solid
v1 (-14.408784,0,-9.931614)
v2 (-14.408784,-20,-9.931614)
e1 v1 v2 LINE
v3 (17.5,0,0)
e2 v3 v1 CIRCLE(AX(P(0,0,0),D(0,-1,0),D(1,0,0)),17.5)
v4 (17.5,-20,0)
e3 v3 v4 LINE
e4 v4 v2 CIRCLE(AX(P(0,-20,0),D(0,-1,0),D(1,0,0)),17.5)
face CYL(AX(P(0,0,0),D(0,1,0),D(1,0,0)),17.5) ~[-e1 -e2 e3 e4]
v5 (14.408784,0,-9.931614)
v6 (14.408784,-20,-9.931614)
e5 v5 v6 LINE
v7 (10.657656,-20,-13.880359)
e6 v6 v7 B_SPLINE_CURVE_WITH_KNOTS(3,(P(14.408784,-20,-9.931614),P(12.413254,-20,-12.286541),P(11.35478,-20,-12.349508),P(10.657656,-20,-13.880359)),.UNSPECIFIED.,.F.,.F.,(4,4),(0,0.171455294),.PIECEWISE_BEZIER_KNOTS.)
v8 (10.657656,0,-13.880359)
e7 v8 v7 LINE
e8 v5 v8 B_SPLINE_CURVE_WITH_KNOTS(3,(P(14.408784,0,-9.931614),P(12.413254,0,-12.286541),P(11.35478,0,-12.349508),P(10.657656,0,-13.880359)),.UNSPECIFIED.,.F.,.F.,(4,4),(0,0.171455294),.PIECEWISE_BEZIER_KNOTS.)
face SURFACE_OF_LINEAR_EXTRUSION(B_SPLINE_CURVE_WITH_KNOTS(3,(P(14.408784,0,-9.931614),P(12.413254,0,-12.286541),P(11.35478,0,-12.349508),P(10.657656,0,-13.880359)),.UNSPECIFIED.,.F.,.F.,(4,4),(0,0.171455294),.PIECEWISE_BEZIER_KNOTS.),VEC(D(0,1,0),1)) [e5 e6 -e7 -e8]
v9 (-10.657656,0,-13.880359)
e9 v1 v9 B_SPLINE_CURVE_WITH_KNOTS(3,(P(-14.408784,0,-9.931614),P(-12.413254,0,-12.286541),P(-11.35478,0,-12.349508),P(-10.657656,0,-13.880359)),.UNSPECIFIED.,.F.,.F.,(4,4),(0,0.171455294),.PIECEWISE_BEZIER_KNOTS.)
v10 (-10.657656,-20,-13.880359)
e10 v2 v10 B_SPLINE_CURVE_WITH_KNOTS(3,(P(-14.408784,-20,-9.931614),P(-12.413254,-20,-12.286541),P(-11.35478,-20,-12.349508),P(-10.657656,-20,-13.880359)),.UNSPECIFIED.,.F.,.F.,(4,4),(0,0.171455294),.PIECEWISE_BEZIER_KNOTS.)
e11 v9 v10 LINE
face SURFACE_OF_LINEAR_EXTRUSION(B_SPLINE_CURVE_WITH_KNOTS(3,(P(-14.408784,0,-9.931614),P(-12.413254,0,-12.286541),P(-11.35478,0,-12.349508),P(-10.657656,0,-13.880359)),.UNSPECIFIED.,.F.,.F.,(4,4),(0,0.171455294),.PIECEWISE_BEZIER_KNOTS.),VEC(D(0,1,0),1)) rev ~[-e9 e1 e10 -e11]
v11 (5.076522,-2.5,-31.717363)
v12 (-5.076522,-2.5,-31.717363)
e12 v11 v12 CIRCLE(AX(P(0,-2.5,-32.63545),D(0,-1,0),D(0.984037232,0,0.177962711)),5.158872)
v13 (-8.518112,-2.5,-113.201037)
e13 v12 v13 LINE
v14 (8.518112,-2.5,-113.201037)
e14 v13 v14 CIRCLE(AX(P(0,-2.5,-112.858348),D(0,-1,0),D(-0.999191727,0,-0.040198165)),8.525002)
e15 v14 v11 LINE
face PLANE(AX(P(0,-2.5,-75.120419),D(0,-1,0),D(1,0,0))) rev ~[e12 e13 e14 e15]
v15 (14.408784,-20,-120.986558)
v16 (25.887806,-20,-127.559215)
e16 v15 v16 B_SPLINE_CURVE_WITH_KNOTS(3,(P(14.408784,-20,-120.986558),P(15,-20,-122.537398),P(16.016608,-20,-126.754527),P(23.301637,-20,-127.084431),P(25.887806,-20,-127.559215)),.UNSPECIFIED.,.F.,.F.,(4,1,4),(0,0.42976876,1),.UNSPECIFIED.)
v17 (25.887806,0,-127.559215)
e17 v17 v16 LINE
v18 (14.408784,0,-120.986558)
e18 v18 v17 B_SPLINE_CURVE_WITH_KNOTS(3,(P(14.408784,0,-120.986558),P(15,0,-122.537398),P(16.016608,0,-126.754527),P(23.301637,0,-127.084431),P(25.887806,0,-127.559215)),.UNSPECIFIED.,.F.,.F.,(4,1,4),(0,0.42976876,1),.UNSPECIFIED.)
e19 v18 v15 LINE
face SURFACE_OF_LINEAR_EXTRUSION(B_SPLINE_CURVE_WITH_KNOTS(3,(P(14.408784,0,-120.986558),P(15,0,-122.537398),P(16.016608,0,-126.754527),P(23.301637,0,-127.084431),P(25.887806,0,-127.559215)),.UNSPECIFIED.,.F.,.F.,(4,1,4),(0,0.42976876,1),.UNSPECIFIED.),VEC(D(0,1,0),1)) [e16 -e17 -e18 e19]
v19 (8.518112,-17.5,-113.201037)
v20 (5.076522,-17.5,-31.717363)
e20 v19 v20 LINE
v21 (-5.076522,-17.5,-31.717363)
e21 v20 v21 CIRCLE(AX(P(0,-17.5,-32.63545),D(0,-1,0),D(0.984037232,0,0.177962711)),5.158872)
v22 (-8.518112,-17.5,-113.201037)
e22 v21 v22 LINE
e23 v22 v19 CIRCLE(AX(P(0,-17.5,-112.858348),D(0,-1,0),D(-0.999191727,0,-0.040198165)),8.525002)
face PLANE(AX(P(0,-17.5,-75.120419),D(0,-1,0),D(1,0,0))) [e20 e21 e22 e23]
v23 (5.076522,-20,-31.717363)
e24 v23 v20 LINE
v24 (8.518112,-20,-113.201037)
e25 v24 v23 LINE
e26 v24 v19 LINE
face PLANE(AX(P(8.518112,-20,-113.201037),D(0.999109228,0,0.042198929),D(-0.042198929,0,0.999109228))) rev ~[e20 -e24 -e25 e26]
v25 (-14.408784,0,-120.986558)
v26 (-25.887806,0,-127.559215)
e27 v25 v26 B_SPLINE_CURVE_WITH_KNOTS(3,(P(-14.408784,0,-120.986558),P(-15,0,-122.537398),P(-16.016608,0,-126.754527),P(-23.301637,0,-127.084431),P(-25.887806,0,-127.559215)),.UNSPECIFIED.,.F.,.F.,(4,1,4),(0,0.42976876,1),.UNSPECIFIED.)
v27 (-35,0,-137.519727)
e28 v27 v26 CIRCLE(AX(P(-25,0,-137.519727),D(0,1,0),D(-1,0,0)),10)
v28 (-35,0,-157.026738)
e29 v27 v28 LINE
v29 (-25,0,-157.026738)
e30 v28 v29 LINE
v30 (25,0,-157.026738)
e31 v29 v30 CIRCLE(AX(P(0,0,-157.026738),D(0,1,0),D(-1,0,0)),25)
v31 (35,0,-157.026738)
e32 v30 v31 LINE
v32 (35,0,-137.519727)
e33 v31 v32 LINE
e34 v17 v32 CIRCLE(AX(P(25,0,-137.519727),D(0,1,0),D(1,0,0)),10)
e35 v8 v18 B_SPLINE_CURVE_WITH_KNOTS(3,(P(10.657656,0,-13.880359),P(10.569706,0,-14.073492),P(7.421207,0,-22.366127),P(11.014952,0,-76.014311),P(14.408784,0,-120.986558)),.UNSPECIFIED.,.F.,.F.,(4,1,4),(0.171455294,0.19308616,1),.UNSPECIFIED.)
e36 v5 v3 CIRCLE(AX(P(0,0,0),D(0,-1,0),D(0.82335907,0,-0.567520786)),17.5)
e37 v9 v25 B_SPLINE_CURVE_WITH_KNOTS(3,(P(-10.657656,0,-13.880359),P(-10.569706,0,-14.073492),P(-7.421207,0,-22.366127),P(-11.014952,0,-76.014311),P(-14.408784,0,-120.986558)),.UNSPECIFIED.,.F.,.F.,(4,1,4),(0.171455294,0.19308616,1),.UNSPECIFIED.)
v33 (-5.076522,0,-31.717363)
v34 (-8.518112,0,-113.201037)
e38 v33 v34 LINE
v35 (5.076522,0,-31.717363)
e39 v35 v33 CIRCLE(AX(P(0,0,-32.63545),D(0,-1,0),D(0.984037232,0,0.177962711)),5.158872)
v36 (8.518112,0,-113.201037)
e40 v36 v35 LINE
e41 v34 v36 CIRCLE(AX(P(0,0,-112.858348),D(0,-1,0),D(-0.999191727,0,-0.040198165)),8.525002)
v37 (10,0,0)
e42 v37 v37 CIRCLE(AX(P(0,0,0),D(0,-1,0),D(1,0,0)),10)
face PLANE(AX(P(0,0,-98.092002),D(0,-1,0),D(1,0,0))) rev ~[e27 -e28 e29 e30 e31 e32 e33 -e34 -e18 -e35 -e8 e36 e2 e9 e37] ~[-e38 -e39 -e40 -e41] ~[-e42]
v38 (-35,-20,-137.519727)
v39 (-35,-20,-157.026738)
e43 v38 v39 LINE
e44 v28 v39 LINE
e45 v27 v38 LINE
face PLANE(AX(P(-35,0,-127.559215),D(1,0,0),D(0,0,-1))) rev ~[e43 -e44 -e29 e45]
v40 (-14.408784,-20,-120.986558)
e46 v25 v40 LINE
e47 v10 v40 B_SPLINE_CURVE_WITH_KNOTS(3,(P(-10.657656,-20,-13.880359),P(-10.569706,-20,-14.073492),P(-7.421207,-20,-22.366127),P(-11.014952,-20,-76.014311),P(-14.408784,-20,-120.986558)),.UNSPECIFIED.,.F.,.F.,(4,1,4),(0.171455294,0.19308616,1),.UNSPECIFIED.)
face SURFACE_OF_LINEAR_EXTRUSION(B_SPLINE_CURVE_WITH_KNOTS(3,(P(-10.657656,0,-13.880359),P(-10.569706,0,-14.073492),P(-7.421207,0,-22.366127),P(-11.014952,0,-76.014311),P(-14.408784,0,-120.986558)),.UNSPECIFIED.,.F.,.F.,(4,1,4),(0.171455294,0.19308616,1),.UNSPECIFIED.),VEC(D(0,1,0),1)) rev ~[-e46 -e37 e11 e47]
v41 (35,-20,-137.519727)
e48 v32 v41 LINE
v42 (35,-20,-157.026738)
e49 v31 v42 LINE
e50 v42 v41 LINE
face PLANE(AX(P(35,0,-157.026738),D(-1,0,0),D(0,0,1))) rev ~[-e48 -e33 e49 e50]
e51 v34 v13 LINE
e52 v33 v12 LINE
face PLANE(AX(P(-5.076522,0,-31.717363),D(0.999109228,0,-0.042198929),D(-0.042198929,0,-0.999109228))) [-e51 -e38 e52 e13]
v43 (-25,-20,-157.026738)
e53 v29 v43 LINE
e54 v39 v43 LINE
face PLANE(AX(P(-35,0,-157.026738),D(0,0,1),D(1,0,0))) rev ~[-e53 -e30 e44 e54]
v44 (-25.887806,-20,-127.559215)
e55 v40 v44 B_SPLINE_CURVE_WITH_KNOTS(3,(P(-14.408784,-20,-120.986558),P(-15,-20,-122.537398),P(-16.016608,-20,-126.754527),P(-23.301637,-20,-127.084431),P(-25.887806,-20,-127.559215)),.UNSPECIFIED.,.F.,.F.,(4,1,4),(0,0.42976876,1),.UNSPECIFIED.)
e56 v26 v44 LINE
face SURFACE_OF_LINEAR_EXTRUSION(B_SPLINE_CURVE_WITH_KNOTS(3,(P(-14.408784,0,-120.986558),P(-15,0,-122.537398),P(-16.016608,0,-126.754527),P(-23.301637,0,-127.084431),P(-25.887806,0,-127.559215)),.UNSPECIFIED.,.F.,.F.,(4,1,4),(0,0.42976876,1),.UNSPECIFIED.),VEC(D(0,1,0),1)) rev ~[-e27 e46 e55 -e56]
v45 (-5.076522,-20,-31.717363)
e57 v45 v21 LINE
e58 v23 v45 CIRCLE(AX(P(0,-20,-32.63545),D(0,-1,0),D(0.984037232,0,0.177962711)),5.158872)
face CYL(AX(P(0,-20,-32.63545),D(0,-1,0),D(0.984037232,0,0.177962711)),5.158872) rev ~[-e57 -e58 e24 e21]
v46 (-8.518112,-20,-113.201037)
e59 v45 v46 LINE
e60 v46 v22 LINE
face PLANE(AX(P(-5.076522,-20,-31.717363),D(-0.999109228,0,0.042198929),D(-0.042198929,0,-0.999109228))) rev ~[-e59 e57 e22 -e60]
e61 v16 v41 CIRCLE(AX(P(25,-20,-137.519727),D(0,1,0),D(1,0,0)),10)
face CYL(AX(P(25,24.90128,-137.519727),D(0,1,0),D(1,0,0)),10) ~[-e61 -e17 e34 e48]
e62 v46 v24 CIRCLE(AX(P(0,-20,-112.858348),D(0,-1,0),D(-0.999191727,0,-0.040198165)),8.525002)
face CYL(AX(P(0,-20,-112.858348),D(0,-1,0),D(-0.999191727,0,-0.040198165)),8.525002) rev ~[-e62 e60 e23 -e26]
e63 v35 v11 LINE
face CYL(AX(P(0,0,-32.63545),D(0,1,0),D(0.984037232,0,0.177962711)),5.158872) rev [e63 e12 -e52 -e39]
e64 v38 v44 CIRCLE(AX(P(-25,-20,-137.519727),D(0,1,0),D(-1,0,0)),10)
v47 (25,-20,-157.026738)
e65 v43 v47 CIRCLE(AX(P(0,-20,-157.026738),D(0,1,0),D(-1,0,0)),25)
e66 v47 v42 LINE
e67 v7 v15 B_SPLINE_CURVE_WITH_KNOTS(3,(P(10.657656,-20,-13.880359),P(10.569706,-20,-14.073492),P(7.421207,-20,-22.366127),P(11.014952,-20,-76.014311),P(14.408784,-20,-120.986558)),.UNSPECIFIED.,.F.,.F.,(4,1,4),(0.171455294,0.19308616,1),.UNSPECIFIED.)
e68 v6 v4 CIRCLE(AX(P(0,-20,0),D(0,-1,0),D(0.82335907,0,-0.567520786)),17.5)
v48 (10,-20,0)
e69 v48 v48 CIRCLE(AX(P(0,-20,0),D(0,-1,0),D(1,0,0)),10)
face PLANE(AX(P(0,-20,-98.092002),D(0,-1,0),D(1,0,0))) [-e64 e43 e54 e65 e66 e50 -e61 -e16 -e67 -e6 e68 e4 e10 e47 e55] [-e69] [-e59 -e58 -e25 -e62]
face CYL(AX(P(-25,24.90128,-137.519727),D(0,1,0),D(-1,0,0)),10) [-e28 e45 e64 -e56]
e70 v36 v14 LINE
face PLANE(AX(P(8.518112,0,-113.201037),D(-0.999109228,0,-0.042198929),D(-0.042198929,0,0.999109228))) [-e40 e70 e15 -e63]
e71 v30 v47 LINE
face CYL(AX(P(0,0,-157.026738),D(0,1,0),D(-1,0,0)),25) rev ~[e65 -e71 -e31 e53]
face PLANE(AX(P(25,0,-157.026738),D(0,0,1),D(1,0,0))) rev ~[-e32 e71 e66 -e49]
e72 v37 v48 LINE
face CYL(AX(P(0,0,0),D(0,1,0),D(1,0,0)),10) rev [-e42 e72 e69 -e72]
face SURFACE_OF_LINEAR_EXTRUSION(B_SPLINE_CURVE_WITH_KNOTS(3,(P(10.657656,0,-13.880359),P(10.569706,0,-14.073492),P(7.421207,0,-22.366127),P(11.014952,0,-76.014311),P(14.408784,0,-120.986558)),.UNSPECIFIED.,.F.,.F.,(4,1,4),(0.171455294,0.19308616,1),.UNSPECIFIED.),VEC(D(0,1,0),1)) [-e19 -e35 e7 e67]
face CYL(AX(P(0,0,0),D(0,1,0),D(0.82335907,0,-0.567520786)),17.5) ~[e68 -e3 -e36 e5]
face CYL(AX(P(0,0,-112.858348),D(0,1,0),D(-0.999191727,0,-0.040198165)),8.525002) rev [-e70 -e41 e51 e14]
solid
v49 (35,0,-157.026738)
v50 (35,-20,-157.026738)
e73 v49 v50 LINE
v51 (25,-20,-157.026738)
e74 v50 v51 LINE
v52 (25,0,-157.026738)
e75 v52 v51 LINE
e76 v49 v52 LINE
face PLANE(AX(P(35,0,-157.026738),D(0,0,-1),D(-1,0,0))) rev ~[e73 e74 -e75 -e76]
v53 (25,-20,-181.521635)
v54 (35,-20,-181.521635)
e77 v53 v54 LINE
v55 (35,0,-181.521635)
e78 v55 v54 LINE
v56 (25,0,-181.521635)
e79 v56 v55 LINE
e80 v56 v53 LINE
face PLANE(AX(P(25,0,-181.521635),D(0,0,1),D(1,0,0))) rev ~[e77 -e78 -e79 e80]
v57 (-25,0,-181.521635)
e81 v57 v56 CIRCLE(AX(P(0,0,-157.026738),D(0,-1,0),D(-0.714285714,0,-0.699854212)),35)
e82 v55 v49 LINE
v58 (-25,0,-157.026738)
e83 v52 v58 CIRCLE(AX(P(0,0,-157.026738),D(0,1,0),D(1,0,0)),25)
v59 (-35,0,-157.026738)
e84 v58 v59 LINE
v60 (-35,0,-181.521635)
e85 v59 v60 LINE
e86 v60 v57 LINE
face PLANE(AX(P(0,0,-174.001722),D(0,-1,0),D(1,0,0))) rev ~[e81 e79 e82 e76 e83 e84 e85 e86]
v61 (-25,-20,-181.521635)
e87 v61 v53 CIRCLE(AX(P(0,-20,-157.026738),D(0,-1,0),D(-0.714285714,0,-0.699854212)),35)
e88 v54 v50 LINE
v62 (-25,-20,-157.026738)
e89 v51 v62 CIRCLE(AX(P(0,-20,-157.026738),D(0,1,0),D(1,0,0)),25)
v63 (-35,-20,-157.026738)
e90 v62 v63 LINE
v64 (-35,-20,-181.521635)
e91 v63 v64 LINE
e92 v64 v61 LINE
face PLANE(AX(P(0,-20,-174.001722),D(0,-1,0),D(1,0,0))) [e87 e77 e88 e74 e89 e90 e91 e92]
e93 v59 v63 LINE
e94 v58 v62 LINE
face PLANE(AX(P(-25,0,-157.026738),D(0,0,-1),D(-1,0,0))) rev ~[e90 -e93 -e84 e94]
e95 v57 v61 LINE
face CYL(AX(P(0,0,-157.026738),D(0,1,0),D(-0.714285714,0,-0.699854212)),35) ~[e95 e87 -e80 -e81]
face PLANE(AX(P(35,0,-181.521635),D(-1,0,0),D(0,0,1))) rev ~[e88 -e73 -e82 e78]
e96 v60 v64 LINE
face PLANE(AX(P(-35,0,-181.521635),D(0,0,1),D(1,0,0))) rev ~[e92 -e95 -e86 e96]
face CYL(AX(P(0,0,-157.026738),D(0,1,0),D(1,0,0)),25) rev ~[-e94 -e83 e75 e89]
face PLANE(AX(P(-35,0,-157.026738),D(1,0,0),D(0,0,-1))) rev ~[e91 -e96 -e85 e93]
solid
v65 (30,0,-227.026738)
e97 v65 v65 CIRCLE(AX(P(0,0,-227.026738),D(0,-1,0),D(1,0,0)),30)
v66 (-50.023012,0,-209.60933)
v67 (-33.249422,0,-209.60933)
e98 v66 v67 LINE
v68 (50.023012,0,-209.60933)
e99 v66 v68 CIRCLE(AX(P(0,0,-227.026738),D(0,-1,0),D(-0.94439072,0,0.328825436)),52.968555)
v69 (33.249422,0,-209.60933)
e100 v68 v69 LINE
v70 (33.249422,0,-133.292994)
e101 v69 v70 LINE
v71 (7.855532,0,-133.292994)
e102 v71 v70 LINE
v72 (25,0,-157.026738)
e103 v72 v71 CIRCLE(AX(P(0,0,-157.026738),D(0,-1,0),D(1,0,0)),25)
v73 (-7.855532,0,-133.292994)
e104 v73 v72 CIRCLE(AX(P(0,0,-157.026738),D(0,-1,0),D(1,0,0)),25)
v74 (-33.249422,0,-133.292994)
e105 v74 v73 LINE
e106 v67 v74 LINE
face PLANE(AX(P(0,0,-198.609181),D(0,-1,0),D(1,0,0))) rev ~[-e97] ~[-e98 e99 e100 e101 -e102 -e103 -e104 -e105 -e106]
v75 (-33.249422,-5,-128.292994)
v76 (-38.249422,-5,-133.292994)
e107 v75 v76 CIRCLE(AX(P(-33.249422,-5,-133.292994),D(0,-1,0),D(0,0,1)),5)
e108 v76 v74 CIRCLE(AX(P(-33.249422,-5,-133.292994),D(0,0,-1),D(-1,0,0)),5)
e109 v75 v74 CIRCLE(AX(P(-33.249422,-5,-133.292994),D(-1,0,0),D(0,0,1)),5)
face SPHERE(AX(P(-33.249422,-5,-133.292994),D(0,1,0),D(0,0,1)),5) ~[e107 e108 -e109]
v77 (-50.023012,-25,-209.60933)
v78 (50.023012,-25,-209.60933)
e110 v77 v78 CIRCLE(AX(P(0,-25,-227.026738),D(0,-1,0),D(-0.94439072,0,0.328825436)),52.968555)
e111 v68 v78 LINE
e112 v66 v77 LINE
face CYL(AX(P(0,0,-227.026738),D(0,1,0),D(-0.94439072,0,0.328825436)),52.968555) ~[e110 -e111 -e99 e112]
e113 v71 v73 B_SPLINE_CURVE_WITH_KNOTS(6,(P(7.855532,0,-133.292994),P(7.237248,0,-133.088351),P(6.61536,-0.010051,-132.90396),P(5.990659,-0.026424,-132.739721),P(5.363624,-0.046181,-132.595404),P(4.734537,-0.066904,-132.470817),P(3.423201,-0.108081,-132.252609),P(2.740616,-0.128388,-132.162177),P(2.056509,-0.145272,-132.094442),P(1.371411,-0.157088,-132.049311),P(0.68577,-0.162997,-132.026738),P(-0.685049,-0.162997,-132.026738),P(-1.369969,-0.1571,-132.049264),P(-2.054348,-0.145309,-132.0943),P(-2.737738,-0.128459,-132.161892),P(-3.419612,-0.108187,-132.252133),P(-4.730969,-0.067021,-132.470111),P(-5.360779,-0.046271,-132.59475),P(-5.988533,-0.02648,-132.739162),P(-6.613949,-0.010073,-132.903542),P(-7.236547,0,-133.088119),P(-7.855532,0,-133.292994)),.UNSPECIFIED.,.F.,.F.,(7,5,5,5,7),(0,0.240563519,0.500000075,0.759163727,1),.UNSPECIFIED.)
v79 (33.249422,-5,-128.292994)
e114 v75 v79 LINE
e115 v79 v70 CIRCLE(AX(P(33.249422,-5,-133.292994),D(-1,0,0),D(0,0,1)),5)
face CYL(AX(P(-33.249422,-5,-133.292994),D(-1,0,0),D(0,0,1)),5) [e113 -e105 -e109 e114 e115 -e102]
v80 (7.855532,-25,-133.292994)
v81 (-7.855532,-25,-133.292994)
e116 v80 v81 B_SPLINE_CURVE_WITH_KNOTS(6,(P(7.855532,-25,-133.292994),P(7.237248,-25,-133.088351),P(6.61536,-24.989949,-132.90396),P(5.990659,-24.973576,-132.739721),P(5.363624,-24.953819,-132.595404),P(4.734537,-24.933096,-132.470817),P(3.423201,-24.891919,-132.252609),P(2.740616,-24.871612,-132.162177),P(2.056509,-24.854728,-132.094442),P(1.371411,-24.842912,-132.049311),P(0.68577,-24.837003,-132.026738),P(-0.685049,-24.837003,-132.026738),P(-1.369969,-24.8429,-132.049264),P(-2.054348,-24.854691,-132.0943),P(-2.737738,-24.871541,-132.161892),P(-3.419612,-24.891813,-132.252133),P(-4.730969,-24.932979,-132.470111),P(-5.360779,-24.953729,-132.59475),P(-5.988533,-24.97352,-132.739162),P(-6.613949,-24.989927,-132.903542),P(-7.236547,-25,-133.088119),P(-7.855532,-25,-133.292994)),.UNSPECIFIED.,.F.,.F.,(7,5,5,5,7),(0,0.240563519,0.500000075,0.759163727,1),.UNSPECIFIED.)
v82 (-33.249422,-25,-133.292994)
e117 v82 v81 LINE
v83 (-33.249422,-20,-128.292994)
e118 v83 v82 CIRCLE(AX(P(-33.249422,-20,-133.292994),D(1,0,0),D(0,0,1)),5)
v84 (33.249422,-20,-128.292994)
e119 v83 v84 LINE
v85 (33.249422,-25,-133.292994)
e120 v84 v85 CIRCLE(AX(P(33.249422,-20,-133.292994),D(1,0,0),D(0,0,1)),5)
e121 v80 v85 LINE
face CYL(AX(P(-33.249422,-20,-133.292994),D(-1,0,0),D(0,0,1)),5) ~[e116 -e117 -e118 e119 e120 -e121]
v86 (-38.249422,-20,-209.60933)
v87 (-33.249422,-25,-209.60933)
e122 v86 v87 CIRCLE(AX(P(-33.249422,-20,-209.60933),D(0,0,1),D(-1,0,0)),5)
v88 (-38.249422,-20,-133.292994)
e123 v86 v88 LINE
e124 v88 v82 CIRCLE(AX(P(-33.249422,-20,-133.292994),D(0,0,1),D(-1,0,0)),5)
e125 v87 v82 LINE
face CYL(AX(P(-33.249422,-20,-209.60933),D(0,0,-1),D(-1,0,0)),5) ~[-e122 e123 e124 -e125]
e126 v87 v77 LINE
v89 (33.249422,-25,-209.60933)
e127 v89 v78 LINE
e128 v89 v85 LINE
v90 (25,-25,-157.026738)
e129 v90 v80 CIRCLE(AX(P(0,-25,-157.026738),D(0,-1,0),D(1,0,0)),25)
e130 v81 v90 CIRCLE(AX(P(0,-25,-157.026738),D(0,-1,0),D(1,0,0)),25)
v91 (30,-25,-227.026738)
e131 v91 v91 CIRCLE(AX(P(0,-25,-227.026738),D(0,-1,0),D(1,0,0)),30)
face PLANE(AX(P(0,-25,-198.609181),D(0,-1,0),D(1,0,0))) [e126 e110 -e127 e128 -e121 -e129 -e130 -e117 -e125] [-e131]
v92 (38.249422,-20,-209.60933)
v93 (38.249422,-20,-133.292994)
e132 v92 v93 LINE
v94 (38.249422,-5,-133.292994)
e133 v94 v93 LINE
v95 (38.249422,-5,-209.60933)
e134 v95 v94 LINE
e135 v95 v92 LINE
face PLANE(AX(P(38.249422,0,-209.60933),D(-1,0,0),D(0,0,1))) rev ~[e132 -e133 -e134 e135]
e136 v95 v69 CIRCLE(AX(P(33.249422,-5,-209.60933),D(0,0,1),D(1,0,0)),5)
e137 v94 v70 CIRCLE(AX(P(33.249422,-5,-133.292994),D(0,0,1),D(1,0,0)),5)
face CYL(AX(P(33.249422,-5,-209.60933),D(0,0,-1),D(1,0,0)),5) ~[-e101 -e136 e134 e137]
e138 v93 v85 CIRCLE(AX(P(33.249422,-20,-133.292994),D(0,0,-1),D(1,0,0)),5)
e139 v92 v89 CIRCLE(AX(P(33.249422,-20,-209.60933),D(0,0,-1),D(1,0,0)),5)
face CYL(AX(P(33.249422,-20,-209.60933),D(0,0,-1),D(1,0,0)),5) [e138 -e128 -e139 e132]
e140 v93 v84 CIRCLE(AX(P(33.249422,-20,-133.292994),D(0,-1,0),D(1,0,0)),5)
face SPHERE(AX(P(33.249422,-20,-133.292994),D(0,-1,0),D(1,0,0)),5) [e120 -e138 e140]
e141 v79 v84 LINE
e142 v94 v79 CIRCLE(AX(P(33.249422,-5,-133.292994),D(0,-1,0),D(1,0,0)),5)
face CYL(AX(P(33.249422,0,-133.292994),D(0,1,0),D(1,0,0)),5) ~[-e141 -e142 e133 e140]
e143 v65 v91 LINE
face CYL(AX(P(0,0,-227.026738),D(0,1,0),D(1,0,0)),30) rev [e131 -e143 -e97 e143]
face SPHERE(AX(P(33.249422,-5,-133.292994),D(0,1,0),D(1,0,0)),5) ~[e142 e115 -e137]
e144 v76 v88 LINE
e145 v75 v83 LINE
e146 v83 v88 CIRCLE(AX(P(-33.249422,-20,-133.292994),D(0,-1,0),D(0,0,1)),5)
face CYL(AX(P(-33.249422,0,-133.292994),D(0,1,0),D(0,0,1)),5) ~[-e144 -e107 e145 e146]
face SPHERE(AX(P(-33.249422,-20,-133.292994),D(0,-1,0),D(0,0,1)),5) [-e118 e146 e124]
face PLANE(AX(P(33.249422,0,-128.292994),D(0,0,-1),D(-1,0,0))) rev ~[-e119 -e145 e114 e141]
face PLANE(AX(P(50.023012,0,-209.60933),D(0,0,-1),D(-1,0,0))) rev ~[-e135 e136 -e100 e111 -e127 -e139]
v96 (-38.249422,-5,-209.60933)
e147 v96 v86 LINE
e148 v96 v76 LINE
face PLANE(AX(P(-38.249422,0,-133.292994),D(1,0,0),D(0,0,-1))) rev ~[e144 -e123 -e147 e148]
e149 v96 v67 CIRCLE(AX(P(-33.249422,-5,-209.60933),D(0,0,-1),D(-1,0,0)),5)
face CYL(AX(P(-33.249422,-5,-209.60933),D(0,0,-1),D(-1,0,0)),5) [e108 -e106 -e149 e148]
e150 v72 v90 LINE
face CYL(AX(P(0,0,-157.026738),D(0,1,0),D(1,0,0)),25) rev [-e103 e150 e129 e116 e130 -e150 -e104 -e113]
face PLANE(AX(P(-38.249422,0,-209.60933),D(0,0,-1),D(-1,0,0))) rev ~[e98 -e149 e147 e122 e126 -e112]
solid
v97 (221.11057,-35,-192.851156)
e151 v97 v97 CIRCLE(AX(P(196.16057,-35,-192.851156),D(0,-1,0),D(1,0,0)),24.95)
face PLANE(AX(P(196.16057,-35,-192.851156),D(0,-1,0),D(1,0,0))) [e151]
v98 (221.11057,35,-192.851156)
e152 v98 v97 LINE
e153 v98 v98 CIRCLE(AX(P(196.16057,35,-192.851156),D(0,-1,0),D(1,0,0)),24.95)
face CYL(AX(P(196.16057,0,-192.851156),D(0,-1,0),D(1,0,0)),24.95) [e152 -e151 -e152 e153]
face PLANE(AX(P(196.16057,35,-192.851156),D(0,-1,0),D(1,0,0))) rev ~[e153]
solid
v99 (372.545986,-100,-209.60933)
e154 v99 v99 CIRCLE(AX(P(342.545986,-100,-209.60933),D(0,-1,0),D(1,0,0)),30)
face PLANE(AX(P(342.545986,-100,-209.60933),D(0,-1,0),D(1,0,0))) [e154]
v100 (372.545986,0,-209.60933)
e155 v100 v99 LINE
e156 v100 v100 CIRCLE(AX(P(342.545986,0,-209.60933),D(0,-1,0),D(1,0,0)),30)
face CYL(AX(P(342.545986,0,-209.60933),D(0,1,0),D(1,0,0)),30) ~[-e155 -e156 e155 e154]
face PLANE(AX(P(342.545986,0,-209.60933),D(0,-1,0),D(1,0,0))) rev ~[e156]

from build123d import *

# Parameters (mm, degrees)
F0_R          = 10
F1_DEPTH      = 20
F3_DEPTH      = 20
F5_DEPTH      = 2.5
F7_DEPTH      = 2.5
F8_R          = 30
F8_R_2        = 25
F9_DEPTH      = 25
F10_R         = 24.95
F11_DEPTH     = 35
F12_R         = 30
F13_DEPTH     = 100
F14_T1_DEPTH  = 66.4988437295
F14_T3_DEPTH  = 76.3163360927
F14_T6_ANGLE  = 90
F14_T8_ANGLE  = 90
F14_T10_ANGLE = 90
F14_T12_ANGLE = 90
F15_T1_DEPTH  = 69.8025602819


# Not quite as in the source:
# - a fillet or chamfer that OpenCascade refuses, or shapes differently, is made with other operations: its cross-section is extruded or revolved along the edge and cut away or added


with BuildPart() as f1:
    # F0 (on Front) → F1 (new body)
    with BuildSketch(Plane.XZ):
        with BuildLine():
            ThreePointArc((10.657655781, -13.8803592624), (0, -17.5), (-10.657655781, -13.8803592624))
            add(Edge.make_bspline(
                [(-10.657655781, -13.8803592624), (-10.5697063214, -14.0734920796), (-7.4212070748, -22.3661273448), (-11.0149524319, -76.0143110226), (-14.4087837187, -120.986558497)],
                knots=[0.171455294, 0.171455294, 0.171455294, 0.171455294, 0.1930861601, 1, 1, 1, 1], degree=3))
            add(Edge.make_bspline(
                [(-14.4087837187, -120.986558497), (-15, -122.5373980972), (-16.0166076681, -126.7545271526), (-23.3016373721, -127.0844308904), (-25.8878060456, -127.5592148304)],
                knots=[0, 0, 0, 0, 0.4297687598, 1, 1, 1, 1], degree=3))
            Line((-25.8878060456, -127.5592148304), (-35, -127.5592148304))
            Line((-35, -127.5592148304), (-35, -157.0267379284))
            Line((-35, -157.0267379284), (-25, -157.0267379284))
            ThreePointArc((-25, -157.0267379284), (0, -132.0267379284), (25, -157.0267379284))
            Line((25, -157.0267379284), (35, -157.0267379284))
            Line((35, -157.0267379284), (35, -127.5592148304))
            Line((35, -127.5592148304), (25.8878060456, -127.5592148304))
            add(Edge.make_bspline(
                [(14.4087837187, -120.986558497), (15, -122.5373980972), (16.0166076681, -126.7545271526), (23.3016373721, -127.0844308904), (25.8878060456, -127.5592148304)],
                knots=[0, 0, 0, 0, 0.4297687598, 1, 1, 1, 1], degree=3))
            add(Edge.make_bspline(
                [(10.657655781, -13.8803592624), (10.5697063214, -14.0734920796), (7.4212070748, -22.3661273448), (11.0149524319, -76.0143110226), (14.4087837187, -120.986558497)],
                knots=[0.171455294, 0.171455294, 0.171455294, 0.171455294, 0.1930861601, 1, 1, 1, 1], degree=3))
        make_face()
        with BuildLine():
            ThreePointArc((14.4087837187, -9.9316137535), (16.7093344433, -5.2007828701), (17.5, 0))
            ThreePointArc((17.5, 0), (-5.2007828701, 16.7093344433), (-14.4087837187, -9.9316137535))
            add(Edge.make_bspline(
                [(-14.4087837187, -9.9316137535), (-12.4132538877, -12.2865411794), (-11.3547799907, -12.3495077572), (-10.657655781, -13.8803592624)],
                knots=[0, 0, 0, 0, 0.171455294, 0.171455294, 0.171455294, 0.171455294], degree=3))
            ThreePointArc((-10.657655781, -13.8803592624), (0, -17.5), (10.657655781, -13.8803592624))
            add(Edge.make_bspline(
                [(14.4087837187, -9.9316137535), (12.4132538877, -12.2865411794), (11.3547799907, -12.3495077572), (10.657655781, -13.8803592624)],
                knots=[0, 0, 0, 0, 0.171455294, 0.171455294, 0.171455294, 0.171455294], degree=3))
        make_face()
        Circle(F0_R, mode=Mode.SUBTRACT)
    extrude(amount=F1_DEPTH)

    # F4 (on face) → F5 (cut)
    with BuildSketch(Plane.XZ.offset(20)):
        with BuildLine():
            Line((8.518111892, -113.2010370493), (5.076522479, -31.7173634542))
            ThreePointArc((5.076522479, -31.7173634542), (0, -27.4765780007), (-5.076522479, -31.7173634542))
            Line((-5.076522479, -31.7173634542), (-8.518111892, -113.2010370493))
            ThreePointArc((-8.518111892, -113.2010370493), (0, -121.3833500151), (8.518111892, -113.2010370493))
        make_face()
    extrude(amount=-F5_DEPTH, mode=Mode.SUBTRACT)

    # F6 (on face) → F7 (cut)
    with BuildSketch(Plane.XZ):
        with BuildLine():
            Line((8.518111892, -113.2010370493), (5.076522479, -31.7173634542))
            ThreePointArc((5.076522479, -31.7173634542), (0, -27.4765780007), (-5.076522479, -31.7173634542))
            Line((-5.076522479, -31.7173634542), (-8.518111892, -113.2010370493))
            ThreePointArc((-8.518111892, -113.2010370493), (0, -121.3833500151), (8.518111892, -113.2010370493))
        make_face()
    extrude(amount=F7_DEPTH, mode=Mode.SUBTRACT)

    # F15: fillet of radius 10 on 2 edges, made by hand

    # F15_s2 → F15_t1 (cut)
    with BuildSketch(Plane.XZ.offset(-24.901280141)):
        with BuildLine():
            ThreePointArc((35, -137.5197268868), (32.3782809806, -130.769840238), (25.8878060456, -127.5592148304))
            Line((25.8878060456, -127.5592148304), (35, -127.5592148304))
            Line((35, -127.5592148304), (35, -137.5197268868))
        make_face()
        with BuildLine():
            ThreePointArc((-35, -137.5197268868), (-32.3782809806, -130.769840238), (-25.8878060456, -127.5592148304))
            Line((-25.8878060456, -127.5592148304), (-35, -127.5592148304))
            Line((-35, -127.5592148304), (-35, -137.5197268868))
        make_face()
    extrude(amount=F15_T1_DEPTH, mode=Mode.SUBTRACT)


with BuildPart() as f3:
    # F2 (on Front) → F3 (new body)
    with BuildSketch(Plane.XZ):
        with BuildLine():
            ThreePointArc((25, -157.0267379284), (0, -182.0267379284), (-25, -157.0267379284))
            Line((-25, -157.0267379284), (-35, -157.0267379284))
            ThreePointArc((-35, -157.0267379284), (-32.403703492, -170.2554944837), (-25, -181.5216353562))
            ThreePointArc((-25, -181.5216353562), (0, -192.0267379284), (25, -181.5216353562))
            ThreePointArc((25, -181.5216353562), (32.403703492, -170.2554944837), (35, -157.0267379284))
            Line((35, -157.0267379284), (25, -157.0267379284))
        make_face()
        with BuildLine():
            ThreePointArc((-25, -181.5216353562), (-32.403703492, -170.2554944837), (-35, -157.0267379284))
            Line((-35, -157.0267379284), (-35, -181.5216353562))
            Line((-35, -181.5216353562), (-25, -181.5216353562))
        make_face()
        with BuildLine():
            Line((35, -181.5216353562), (35, -157.0267379284))
            ThreePointArc((35, -157.0267379284), (32.403703492, -170.2554944837), (25, -181.5216353562))
            Line((25, -181.5216353562), (35, -181.5216353562))
        make_face()
    extrude(amount=F3_DEPTH)


with BuildPart() as f9:
    # F8 (on Front) → F9 (new body)
    with BuildSketch(Plane.XZ):
        with BuildLine():
            ThreePointArc((38.2494218647, -133.2929936077), (36.7849557707, -129.7574597018), (33.2494218647, -128.2929936077))
            Line((33.2494218647, -128.2929936077), (-33.2494218647, -128.2929936077))
            ThreePointArc((-33.2494218647, -128.2929936077), (-36.7849557707, -129.7574597018), (-38.2494218647, -133.2929936077))
            Line((-38.2494218647, -133.2929936077), (-38.2494218647, -209.6093297005))
            Line((-38.2494218647, -209.6093297005), (-50.0230118632, -209.6093297005))
            ThreePointArc((-50.0230118632, -209.6093297005), (0, -279.9952929894), (50.0230118632, -209.6093297005))
            Line((50.0230118632, -209.6093297005), (38.2494218647, -209.6093297005))
            Line((38.2494218647, -209.6093297005), (38.2494218647, -133.2929936077))
        make_face()
        with Locations((0, -227.0267379284)):
            Circle(F8_R, mode=Mode.SUBTRACT)
        with Locations((0, -157.0267379284)):
            Circle(F8_R_2, mode=Mode.SUBTRACT)
    extrude(amount=F9_DEPTH)

    # F14: fillet of radius 5 on 10 edges, made by hand

    # F14_s2 → F14_t1 (cut)
    with BuildSketch(Plane.YZ.offset(-33.2494218647)):
        with BuildLine():
            ThreePointArc((-5, -128.2929936077), (-1.4644660941, -129.7574597018), (0, -133.2929936077))
            Line((0, -133.2929936077), (0, -128.2929936077))
            Line((0, -128.2929936077), (-5, -128.2929936077))
        make_face()
        with BuildLine():
            ThreePointArc((-20, -128.2929936077), (-23.5355339059, -129.7574597018), (-25, -133.2929936077))
            Line((-25, -133.2929936077), (-25, -128.2929936077))
            Line((-25, -128.2929936077), (-20, -128.2929936077))
        make_face()
    extrude(amount=F14_T1_DEPTH, mode=Mode.SUBTRACT)

    # F14_s4 → F14_t3 (cut)
    with BuildSketch(Plane.XY.offset(-209.6093297005)):
        with BuildLine():
            ThreePointArc((38.2494218647, -5), (36.7849557707, -1.4644660941), (33.2494218647, 0))
            Line((33.2494218647, 0), (38.2494218647, 0))
            Line((38.2494218647, 0), (38.2494218647, -5))
        make_face()
        with BuildLine():
            ThreePointArc((38.2494218647, -20), (36.7849557707, -23.5355339059), (33.2494218647, -25))
            Line((33.2494218647, -25), (38.2494218647, -25))
            Line((38.2494218647, -25), (38.2494218647, -20))
        make_face()
        with BuildLine():
            ThreePointArc((-38.2494218647, -5), (-36.7849557707, -1.4644660941), (-33.2494218647, 0))
            Line((-33.2494218647, 0), (-38.2494218647, 0))
            Line((-38.2494218647, 0), (-38.2494218647, -5))
        make_face()
        with BuildLine():
            ThreePointArc((-38.2494218647, -20), (-36.7849557707, -23.5355339059), (-33.2494218647, -25))
            Line((-33.2494218647, -25), (-38.2494218647, -25))
            Line((-38.2494218647, -25), (-38.2494218647, -20))
        make_face()
    extrude(amount=F14_T3_DEPTH, mode=Mode.SUBTRACT)

    # F14_s5 → F14_t6 (revolve, cut)
    with BuildSketch(Plane.YZ.offset(-33.2494218647)):
        with BuildLine():
            ThreePointArc((-20, -128.2929936077), (-23.5355339059, -129.7574597018), (-25, -133.2929936077))
            Line((-25, -133.2929936077), (-25, -128.2929936077))
            Line((-25, -128.2929936077), (-20, -128.2929936077))
        make_face()
    revolve(axis=Axis((-33.2494218647, -25, -133.2929936077), (0, -1, 0)), revolution_arc=F14_T6_ANGLE, mode=Mode.SUBTRACT)

    # F14_s7 → F14_t8 (revolve, cut)
    with BuildSketch(Plane.XY.offset(-133.2929936077)):
        with BuildLine():
            ThreePointArc((38.2494218647, -5), (36.7849557707, -1.4644660941), (33.2494218647, 0))
            Line((33.2494218647, 0), (38.2494218647, 0))
            Line((38.2494218647, 0), (38.2494218647, -5))
        make_face()
    revolve(axis=Axis((33.2494218647, 0, -133.2929936077), (0, -1, 0)), revolution_arc=F14_T8_ANGLE, mode=Mode.SUBTRACT)

    # F14_s9 → F14_t10 (revolve, cut)
    with BuildSketch(Plane.XY.offset(-133.2929936077)):
        with BuildLine():
            ThreePointArc((38.2494218647, -20), (36.7849557707, -23.5355339059), (33.2494218647, -25))
            Line((33.2494218647, -25), (38.2494218647, -25))
            Line((38.2494218647, -25), (38.2494218647, -20))
        make_face()
    revolve(axis=Axis((33.2494218647, -25, -133.2929936077), (0, -1, 0)), revolution_arc=F14_T10_ANGLE, mode=Mode.SUBTRACT)

    # F14_s11 → F14_t12 (revolve, cut)
    with BuildSketch(Plane.YZ.offset(-33.2494218647)):
        with BuildLine():
            ThreePointArc((-5, -128.2929936077), (-1.4644660941, -129.7574597018), (0, -133.2929936077))
            Line((0, -133.2929936077), (0, -128.2929936077))
            Line((0, -128.2929936077), (-5, -128.2929936077))
        make_face()
    revolve(axis=Axis((-33.2494218647, 0, -133.2929936077), (0, -1, 0)), revolution_arc=F14_T12_ANGLE, mode=Mode.SUBTRACT)


with BuildPart() as f11:
    # F10 (on Front) → F11 (new body, symmetric)
    with BuildSketch(Plane.XZ):
        with Locations((196.160569787, -192.8511559963)):
            Circle(F10_R)
    extrude(amount=F11_DEPTH, both=True)


with BuildPart() as f13:
    # F12 (on Front) → F13 (new body)
    with BuildSketch(Plane.XZ):
        with Locations((342.5459861755, -209.6093297005)):
            Circle(F12_R)
    extrude(amount=F13_DEPTH)


solid = Compound([f1.part, f3.part, f9.part, f11.part, f13.part])
